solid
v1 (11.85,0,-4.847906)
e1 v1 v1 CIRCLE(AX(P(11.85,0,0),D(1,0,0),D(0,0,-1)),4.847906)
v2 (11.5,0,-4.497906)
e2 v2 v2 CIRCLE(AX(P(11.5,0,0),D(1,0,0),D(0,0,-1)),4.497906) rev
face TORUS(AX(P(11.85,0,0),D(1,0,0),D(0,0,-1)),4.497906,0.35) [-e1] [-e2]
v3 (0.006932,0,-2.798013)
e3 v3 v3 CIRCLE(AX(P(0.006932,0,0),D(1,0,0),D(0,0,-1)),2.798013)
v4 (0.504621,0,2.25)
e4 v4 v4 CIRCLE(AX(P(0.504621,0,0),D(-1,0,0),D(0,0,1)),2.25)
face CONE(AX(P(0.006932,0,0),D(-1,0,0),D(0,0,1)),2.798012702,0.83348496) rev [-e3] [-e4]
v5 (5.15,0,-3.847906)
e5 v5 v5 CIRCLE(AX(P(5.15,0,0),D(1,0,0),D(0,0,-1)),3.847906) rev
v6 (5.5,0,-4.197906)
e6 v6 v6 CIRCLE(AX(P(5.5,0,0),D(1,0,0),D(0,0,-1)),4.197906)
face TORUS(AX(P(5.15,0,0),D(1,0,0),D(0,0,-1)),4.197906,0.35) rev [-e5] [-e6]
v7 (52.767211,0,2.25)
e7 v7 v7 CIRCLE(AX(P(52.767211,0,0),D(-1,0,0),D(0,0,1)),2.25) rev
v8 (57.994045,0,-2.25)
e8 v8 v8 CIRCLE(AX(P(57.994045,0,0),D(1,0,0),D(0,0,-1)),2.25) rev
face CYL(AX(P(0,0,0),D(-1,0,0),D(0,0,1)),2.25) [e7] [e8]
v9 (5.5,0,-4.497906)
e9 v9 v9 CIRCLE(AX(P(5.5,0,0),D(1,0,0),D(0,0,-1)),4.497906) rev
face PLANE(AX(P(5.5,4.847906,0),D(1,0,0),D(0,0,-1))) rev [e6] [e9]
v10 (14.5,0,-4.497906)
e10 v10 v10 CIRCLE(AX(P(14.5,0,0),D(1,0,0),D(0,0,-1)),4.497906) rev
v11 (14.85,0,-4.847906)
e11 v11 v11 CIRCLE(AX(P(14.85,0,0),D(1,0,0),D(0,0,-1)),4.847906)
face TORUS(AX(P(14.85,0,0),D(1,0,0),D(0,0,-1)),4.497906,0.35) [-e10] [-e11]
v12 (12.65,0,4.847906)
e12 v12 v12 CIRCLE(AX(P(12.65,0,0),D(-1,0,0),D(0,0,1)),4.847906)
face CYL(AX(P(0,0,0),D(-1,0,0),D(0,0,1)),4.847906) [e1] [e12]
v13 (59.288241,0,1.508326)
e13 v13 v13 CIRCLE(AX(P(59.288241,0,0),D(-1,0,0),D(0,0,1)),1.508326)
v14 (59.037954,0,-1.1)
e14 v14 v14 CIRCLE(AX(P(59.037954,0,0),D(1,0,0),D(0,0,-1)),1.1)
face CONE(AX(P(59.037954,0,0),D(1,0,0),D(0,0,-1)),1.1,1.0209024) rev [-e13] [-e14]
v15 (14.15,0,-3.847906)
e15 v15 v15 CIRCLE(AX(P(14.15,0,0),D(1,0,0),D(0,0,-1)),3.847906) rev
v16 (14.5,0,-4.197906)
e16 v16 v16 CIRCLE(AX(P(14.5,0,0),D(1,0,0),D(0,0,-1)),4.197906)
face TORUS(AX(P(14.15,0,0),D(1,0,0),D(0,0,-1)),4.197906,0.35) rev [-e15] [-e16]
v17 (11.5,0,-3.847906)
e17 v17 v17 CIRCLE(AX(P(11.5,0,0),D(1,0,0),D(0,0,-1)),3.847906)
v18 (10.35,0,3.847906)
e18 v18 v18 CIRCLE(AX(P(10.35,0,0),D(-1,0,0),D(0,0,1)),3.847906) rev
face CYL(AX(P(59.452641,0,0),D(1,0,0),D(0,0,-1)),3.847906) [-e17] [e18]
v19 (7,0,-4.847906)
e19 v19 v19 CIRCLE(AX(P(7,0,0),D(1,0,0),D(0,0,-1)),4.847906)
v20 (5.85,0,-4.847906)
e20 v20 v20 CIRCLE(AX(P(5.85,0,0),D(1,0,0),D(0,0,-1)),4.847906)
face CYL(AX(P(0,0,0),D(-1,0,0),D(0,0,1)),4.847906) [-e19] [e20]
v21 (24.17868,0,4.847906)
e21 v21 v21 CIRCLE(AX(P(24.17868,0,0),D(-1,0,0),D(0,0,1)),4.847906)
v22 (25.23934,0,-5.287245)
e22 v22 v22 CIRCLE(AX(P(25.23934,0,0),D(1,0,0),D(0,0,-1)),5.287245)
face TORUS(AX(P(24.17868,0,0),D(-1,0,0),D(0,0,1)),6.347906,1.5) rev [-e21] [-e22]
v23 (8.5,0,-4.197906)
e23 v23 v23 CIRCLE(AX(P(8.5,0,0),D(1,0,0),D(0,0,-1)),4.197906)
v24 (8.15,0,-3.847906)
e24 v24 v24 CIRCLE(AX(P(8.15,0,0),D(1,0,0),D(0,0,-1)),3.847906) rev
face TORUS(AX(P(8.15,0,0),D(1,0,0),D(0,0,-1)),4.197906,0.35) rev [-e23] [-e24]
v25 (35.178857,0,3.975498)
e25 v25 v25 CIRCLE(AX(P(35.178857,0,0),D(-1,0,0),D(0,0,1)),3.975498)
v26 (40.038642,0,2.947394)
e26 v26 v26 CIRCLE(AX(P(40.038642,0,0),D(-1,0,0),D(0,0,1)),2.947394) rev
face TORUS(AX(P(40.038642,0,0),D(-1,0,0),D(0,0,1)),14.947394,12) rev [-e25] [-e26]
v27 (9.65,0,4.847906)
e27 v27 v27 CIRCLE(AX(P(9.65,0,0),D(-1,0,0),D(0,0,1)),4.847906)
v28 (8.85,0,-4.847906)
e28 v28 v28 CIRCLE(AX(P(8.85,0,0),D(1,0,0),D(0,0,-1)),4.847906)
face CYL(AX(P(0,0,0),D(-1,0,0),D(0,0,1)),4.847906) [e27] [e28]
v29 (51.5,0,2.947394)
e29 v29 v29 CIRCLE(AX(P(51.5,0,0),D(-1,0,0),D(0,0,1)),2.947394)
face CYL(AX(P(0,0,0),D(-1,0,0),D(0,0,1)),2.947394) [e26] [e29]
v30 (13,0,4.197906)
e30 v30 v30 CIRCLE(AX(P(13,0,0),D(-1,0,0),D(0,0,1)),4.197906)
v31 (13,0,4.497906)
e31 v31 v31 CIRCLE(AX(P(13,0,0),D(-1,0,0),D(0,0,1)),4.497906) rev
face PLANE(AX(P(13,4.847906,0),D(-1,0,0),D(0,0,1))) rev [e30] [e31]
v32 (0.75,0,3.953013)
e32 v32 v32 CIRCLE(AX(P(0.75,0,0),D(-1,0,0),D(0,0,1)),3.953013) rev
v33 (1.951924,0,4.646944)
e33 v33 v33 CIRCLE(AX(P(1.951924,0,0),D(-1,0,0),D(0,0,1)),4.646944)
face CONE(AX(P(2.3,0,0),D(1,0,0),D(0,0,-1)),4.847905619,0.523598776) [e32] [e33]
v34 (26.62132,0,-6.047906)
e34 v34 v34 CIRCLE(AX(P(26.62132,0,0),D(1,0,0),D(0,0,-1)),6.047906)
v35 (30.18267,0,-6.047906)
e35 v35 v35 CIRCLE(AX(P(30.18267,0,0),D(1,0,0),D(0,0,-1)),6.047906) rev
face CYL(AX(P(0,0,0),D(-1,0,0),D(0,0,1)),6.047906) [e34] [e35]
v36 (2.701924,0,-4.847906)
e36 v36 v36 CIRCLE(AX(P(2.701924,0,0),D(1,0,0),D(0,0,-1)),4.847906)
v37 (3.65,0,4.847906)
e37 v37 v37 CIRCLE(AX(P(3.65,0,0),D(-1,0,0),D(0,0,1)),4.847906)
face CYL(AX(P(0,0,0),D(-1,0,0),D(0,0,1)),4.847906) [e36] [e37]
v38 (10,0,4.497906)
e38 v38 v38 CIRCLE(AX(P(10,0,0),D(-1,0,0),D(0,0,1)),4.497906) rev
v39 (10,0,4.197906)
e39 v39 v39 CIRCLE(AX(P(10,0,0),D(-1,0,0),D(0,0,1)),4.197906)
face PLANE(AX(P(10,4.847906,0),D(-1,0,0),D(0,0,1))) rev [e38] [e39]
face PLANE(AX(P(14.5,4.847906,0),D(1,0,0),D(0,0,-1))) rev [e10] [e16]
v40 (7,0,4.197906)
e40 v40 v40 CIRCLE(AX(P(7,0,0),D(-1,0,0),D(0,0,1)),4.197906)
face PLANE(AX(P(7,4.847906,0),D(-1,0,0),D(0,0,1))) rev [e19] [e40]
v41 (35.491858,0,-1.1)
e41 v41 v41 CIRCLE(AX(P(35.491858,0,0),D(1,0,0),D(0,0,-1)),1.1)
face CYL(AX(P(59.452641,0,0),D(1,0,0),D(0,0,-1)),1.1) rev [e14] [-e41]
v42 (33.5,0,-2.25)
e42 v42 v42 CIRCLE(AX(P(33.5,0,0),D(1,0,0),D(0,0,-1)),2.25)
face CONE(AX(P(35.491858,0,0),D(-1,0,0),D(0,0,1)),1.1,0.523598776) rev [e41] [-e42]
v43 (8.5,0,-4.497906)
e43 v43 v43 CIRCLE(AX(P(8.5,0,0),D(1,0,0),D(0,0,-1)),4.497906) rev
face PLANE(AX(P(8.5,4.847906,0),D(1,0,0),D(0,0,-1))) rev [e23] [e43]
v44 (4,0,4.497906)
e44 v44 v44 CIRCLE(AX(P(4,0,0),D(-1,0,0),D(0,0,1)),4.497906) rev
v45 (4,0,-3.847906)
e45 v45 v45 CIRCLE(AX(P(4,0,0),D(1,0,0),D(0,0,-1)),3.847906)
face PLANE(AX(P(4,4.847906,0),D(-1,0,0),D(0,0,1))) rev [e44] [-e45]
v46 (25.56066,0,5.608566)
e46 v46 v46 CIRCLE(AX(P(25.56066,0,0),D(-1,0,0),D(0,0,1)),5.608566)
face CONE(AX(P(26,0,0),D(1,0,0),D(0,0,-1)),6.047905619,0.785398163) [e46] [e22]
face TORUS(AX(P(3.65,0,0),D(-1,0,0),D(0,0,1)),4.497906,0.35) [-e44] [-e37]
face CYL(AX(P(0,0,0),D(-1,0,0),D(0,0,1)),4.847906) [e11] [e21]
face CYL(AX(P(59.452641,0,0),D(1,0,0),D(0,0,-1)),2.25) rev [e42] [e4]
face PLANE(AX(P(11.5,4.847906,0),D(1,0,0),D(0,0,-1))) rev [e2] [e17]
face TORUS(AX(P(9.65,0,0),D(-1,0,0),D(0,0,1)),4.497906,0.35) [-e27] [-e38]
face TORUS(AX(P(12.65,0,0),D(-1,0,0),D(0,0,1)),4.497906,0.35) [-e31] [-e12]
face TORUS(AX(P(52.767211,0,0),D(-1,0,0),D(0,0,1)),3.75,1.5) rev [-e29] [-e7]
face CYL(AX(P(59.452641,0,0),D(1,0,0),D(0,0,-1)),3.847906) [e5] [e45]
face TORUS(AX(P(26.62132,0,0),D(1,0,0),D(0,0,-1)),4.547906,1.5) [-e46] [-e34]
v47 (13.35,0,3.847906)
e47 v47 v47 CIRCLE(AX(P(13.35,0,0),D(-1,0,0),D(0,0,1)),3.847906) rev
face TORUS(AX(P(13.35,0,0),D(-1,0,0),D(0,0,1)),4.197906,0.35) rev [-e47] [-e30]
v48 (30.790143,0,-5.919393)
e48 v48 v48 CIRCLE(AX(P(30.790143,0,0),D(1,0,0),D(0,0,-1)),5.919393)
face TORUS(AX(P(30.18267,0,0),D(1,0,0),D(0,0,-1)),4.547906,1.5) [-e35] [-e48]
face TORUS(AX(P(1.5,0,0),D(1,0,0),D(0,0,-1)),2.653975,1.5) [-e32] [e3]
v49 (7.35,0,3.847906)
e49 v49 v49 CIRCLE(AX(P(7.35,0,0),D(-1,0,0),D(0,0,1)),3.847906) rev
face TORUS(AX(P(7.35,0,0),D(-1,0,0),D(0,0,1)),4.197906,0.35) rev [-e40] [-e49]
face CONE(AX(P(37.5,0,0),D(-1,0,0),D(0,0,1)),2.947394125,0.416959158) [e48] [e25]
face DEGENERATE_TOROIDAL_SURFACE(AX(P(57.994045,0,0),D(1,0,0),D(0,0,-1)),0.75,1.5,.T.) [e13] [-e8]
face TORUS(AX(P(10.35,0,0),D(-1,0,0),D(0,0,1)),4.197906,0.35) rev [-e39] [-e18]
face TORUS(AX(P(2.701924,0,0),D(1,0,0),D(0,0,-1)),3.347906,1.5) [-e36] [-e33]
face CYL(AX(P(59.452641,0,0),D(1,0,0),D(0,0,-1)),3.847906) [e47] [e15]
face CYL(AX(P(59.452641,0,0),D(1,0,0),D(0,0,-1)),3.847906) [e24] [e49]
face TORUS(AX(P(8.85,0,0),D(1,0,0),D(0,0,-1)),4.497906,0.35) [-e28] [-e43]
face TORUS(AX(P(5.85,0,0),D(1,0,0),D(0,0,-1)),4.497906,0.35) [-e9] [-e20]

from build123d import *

# Parameters (mm, degrees)
SKETCH2_W     = 1.4999999999999982
SKETCH2_H     = 1.0000000000000004
FILLET1_R     = 12
FILLET2_R     = 1.5
CHAMFER2_SIZE = 0.414686489
FILLET3_R     = 0.35


with BuildPart() as part:
    # Sketch1 → Revolve1 (revolve)
    with BuildSketch(Plane.XY, mode=Mode.PRIVATE) as revolve1_sk:
        Polygon((0, 0), (0, 3.5200000000000022), (2.2999999999999994, 4.847905619136144), (24.8, 4.847905619136145), (26, 6.0479056191361495), (30.5, 6.0479056191361495), (37.50000000000001, 2.9473941251088354), (51.49999999999999, 2.947394125108837), (51.90264068586283, 2.2500000000000004), (59.452640685862825, 2.25), (59.452640685862825, 0), align=None)
    revolve(revolve1_sk.sketch.rotate(Axis((0, 0, 0), (1, 0, 0)), 90), axis=Axis((0, 0, 0), (1, 0, 0)))

    # Sketch2 → Cut-Revolve1 (revolve, cut)
    with BuildSketch(Plane.XY, mode=Mode.PRIVATE) as cut_revolve1_sk:
        Polygon((0, 0), (0, 2.2499999999999987), (33.5, 2.2500000000000004), (35.491858428704205, 1.1), (59.45264068586281, 1.1000000000000003), (59.45264068586281, 0), align=None)
        Polygon((3.9999999999999964, 4.847905619136145), (5.5, 4.847905619136145), (5.500000000000002, 3.8479056191361445), (3.999999999999999, 3.8479056191361454), align=None)
        Polygon((7.000000000000003, 4.847905619136145), (8.5, 4.847905619136145), (8.500000000000004, 3.8479056191361445), (7.000000000000003, 3.8479056191361445), align=None)
        with Locations((10.750000000000004, 4.347905619136145)):
            Rectangle(SKETCH2_W, SKETCH2_H)
        Polygon((13.00000000000001, 4.847905619136145), (14.500000000000005, 4.847905619136145), (14.500000000000012, 3.8479056191361445), (13.000000000000005, 3.8479056191361445), align=None)
    revolve(cut_revolve1_sk.sketch.rotate(Axis((59.45264068586281, 0, 0), (-1, 0, 0)), 90), axis=Axis((59.45264068586281, 0, 0), (-1, 0, 0)), mode=Mode.SUBTRACT)

    # Fillet1
    fillet1_edges = [part.edges().sort_by_distance(p)[0] for p in [
        (37.50000000000001, 6.2e-16, -2.9473941251088354),
    ]]
    fillet(fillet1_edges, radius=FILLET1_R)

    # Fillet2
    # the kernel refuses this fillet: 1.5 mm, written as the material it adds along each edge
    with BuildSketch(Plane(origin=(24.8, 0, 0), x_dir=(0, 1.1e-16, 1), z_dir=(0, 1, -1.1e-16))) as fillet2_piece_1:
        with BuildLine():
            CenterArc((4.847905619136145 + FILLET2_R, -FILLET2_R * 0.414213562373), FILLET2_R, 134.9999999999999, 45.00000000000023)
            Line((4.847905619136146, -FILLET2_R * 0.414213562373), (4.847905619136145 - FILLET2_R * 0.02, -FILLET2_R * 0.414213562373))
            Line((4.847905619136145 - FILLET2_R * 0.02, -FILLET2_R * 0.414213562373), (4.847905619136145 - FILLET2_R * 0.02, FILLET2_R * 0.00828427124746))
            Line((4.847905619136145 - FILLET2_R * 0.02, FILLET2_R * 0.00828427124746), (4.847905619136145 + FILLET2_R * 0.27875108319, FILLET2_R * 0.307035354437))
            Line((4.847905619136145 + FILLET2_R * 0.27875108319, FILLET2_R * 0.307035354437), (4.847905619136145 + FILLET2_R * 0.292893218813, FILLET2_R * 0.292893218813))
        make_face()
    revolve(axis=Axis((24.8, 0, 0), (1, 0, 0)))
    with BuildSketch(Plane(origin=(51.90264068586283, 0, 0), x_dir=(0, 1.1e-16, 1), z_dir=(0, 1, -1.1e-16))) as fillet2_piece_2:
        with BuildLine():
            CenterArc((3.7500000000000004, 0.8645703500700961), FILLET2_R, 180, 57.651301677751064)
            Line((2.2500000000000004, 0.8645703500700961), (2.2200000000000006, 0.8645703500700961))
            Line((2.2200000000000006, 0.8645703500700961), (2.2200000000000006, 0))
            Line((2.2200000000000006, 0), (2.2350000000000008, -0.02598076211353373))
            ThreePointArc((2.2350000000000008, -0.02598076211353373), (2.5836970625544207, -0.22730110504495116), (2.931342007611018, -0.4279849065814858))
            Line((2.931342007611018, -0.4279849065814858), (2.947394125108841, -0.40264068586282775))
        make_face()
    revolve(axis=Axis((51.90264068586283, 0, 0), (1, 0, 0)))
    # the kernel refuses this fillet: 1.5 mm, written as the material it takes off along each edge
    with BuildSketch(Plane(origin=(30.5, 0, 0), x_dir=(0, 1.1e-16, 1), z_dir=(0, 1, -1.1e-16))) as fillet2_2_piece_1:
        with BuildLine():
            CenterArc((6.0479056191361495 - FILLET2_R, -FILLET2_R * 0.211553464978), FILLET2_R, 0, 23.889999999999986)
            Line((6.0479056191361495, -FILLET2_R * 0.211553464978), (6.0479056191361495 + FILLET2_R * 0.02, -FILLET2_R * 0.211553464978))
            Line((6.0479056191361495 + FILLET2_R * 0.02, -FILLET2_R * 0.211553464978), (6.0479056191361495 + FILLET2_R * 0.02, FILLET2_R * 0.00423106929956))
            Line((6.0479056191361495 + FILLET2_R * 0.02, FILLET2_R * 0.00423106929956), (6.0479056191361495 - FILLET2_R * 0.0673888551076, FILLET2_R * 0.201528188479))
            Line((6.0479056191361495 - FILLET2_R * 0.0673888551076, FILLET2_R * 0.201528188479), (6.0479056191361495 - FILLET2_R * 0.0856753481447, FILLET2_R * 0.193428548215))
        make_face()
    revolve(axis=Axis((30.5, 0, 0), (1, 0, 0)), mode=Mode.SUBTRACT)
    with BuildSketch(Plane(origin=(26, 0, 0), x_dir=(0, 1.1e-16, 1), z_dir=(0, 1, -1.1e-16))) as fillet2_2_piece_2:
        with BuildLine():
            CenterArc((6.0479056191361495 - FILLET2_R, FILLET2_R * 0.414213562373), FILLET2_R, 314.9999999999998, 45.00000000000023)
            Line((6.0479056191361495 - FILLET2_R * 0.292893218813, -FILLET2_R * 0.292893218813), (6.0479056191361495 - FILLET2_R * 0.27875108319, -FILLET2_R * 0.307035354437))
            Line((6.0479056191361495 - FILLET2_R * 0.27875108319, -FILLET2_R * 0.307035354437), (6.0479056191361495 + FILLET2_R * 0.02, -FILLET2_R * 0.00828427124746))
            Line((6.0479056191361495 + FILLET2_R * 0.02, -FILLET2_R * 0.00828427124746), (6.0479056191361495 + FILLET2_R * 0.02, FILLET2_R * 0.414213562373))
            Line((6.0479056191361495 + FILLET2_R * 0.02, FILLET2_R * 0.414213562373), (6.0479056191361495, FILLET2_R * 0.414213562373))
        make_face()
    revolve(axis=Axis((26, 0, 0), (1, 0, 0)), mode=Mode.SUBTRACT)
    with BuildSketch(Plane(origin=(2.2999999999999994, 0, 0), x_dir=(0, 1.1e-16, 1), z_dir=(0, 1, -1.1e-16))) as fillet2_2_piece_3:
        with BuildLine():
            CenterArc((4.847905619136144 - FILLET2_R, FILLET2_R * 0.267949192431), FILLET2_R, 329.99999999999994, 30.000000000000068)
            Line((4.847905619136144, FILLET2_R * 0.267949192431), (4.847905619136144 + FILLET2_R * 0.02, FILLET2_R * 0.267949192431))
            Line((4.847905619136144 + FILLET2_R * 0.02, FILLET2_R * 0.267949192431), (4.847905619136144 + FILLET2_R * 0.02, -FILLET2_R * 0.00535898384862))
            Line((4.847905619136144 + FILLET2_R * 0.02, -FILLET2_R * 0.00535898384862), (4.847905619136144 - FILLET2_R * 0.11665408814, -FILLET2_R * 0.242050807569))
            Line((4.847905619136144 - FILLET2_R * 0.11665408814, -FILLET2_R * 0.242050807569), (4.847905619136144 - FILLET2_R * 0.133974596216, -FILLET2_R * 0.232050807569))
        make_face()
    revolve(axis=Axis((2.2999999999999994, 0, 0), (1, 0, 0)), mode=Mode.SUBTRACT)
    with BuildSketch(Plane(origin=(0, 0, 0), x_dir=(0, 1.1e-16, 1), z_dir=(0, 1, -1.1e-16))) as fillet2_2_piece_4:
        with BuildLine():
            CenterArc((3.5200000000000022 - FILLET2_R * 0.57735026919, FILLET2_R), FILLET2_R, 270, 59.99999999999994)
            Line((3.5200000000000022 + FILLET2_R * 0.288675134595, FILLET2_R * 0.5), (3.5200000000000022 + FILLET2_R * 0.305995642671, FILLET2_R * 0.49))
            Line((3.5200000000000022 + FILLET2_R * 0.305995642671, FILLET2_R * 0.49), (3.5200000000000022 + FILLET2_R * 0.0115470053838, -FILLET2_R * 0.02))
            Line((3.5200000000000022 + FILLET2_R * 0.0115470053838, -FILLET2_R * 0.02), (3.5200000000000022 - FILLET2_R * 0.57735026919, -FILLET2_R * 0.02))
            Line((3.5200000000000022 - FILLET2_R * 0.57735026919, -FILLET2_R * 0.02), (3.5200000000000022 - FILLET2_R * 0.57735026919, 0))
        make_face()
    revolve(axis=Axis((0, 0, 0), (1, 0, 0)), mode=Mode.SUBTRACT)
    with BuildSketch(Plane(origin=(59.452640685862825, 0, 0), x_dir=(0, 1.1e-16, 1), z_dir=(0, 1, -1.1e-16))) as fillet2_2_piece_5:
        with BuildLine():
            CenterArc((0.7500000000000004, -1.4585952145815), FILLET2_R, 0, 76.50660117844832)
            Line((1.0999999999999994, -2.132e-14), (1.1069999999999993, 0.02917190429160854))
            ThreePointArc((1.1069999999999993, 0.02917190429160854), (1.6749999999999998, 0.03000000000000114), (2.25, 0.03000000000000114))
            Line((2.25, 0.03000000000000114), (2.28, 0))
            Line((2.28, 0), (2.2800000000000002, -1.4585952145815))
            Line((2.2800000000000002, -1.4585952145815), (2.2500000000000004, -1.4585952145815))
        make_face()
    revolve(axis=Axis((59.452640685862825, 0, 0), (1, 0, 0)), mode=Mode.SUBTRACT)

    # Chamfer1: read off the stored shape, not the designer's step
    # Chamfer1 outline → Chamfer1 (revolve, cut)
    with BuildSketch(Plane.YX):
        Polygon((2.25, 0.504621116), (2.25, 0), (2.798012702, 0), (2.798012702, 0.006931675), align=None)
    revolve(axis=Axis((0, 0, 0), (1, 0, 0)), mode=Mode.SUBTRACT)

    # Chamfer2
    # the kernel refuses this chamfer: 0.5, 0.414686489 mm, written as the material it takes off along each edge
    with BuildSketch(Plane(origin=(59.45264068586281, 0, 0), x_dir=(0, 1.1e-16, -1), z_dir=(0, 1, 1.1e-16))) as chamfer2_piece_1:
        with BuildLine():
            Line((1.5083255358605607, 0.16439956412381918), (1.1, CHAMFER2_SIZE))
            Line((1.1, CHAMFER2_SIZE), (1.1000000000000003, 0))
            ThreePointArc((1.1000000000000003, 0), (1.3157778356018057, 0.06938844784601628), (1.5083255358605607, 0.16439956412381918))
        make_face()
    revolve(axis=Axis((59.45264068586281, 0, 0), (-1, 0, 0)), revolution_arc=180, mode=Mode.SUBTRACT)
    with BuildSketch(Plane(origin=(59.45264068586281, 0, 0), x_dir=(0, -2.3e-16, 1), z_dir=(0, -1, -2.3e-16))) as chamfer2_piece_2:
        with BuildLine():
            Line((1.5083255358605607, 0.16439956412381918), (1.1, CHAMFER2_SIZE))
            Line((1.1, CHAMFER2_SIZE), (1.1000000000000003, 0))
            ThreePointArc((1.1000000000000003, 0), (1.3157778356018057, 0.06938844784601628), (1.5083255358605607, 0.16439956412381918))
        make_face()
    revolve(axis=Axis((59.45264068586281, 0, 0), (-1, 0, 0)), revolution_arc=180, mode=Mode.SUBTRACT)

    # Fillet3
    fillet3_edges = [part.edges().sort_by_distance(p)[0] for p in [
        (13.000000000000007, -9e-16, 3.8479056191361445),
        (14.500000000000014, -9e-16, 3.8479056191361445),
        (14.500000000000007, 9e-17, -4.847905619136146),
        (13.000000000000007, 8.4e-16, -4.847905619136146),
        (10.000000000000007, -9e-16, 3.8479056191361445),
        (11.500000000000007, 8.4e-16, -4.847905619136146),
        (10.000000000000007, 8.4e-16, -4.847905619136146),
        (7, -9e-16, 3.8479056191361445),
        (8.500000000000007, -9e-16, 3.8479056191361445),
        (8.5, 8.4e-16, -4.847905619136146),
        (5.5, -9e-16, 3.8479056191361445),
        (5.5, 8.4e-16, -4.847905619136146),
        (3.999999999999993, 8.4e-16, -4.847905619136146),
    ]]
    fillet(fillet3_edges, radius=FILLET3_R)


solid = part.part
